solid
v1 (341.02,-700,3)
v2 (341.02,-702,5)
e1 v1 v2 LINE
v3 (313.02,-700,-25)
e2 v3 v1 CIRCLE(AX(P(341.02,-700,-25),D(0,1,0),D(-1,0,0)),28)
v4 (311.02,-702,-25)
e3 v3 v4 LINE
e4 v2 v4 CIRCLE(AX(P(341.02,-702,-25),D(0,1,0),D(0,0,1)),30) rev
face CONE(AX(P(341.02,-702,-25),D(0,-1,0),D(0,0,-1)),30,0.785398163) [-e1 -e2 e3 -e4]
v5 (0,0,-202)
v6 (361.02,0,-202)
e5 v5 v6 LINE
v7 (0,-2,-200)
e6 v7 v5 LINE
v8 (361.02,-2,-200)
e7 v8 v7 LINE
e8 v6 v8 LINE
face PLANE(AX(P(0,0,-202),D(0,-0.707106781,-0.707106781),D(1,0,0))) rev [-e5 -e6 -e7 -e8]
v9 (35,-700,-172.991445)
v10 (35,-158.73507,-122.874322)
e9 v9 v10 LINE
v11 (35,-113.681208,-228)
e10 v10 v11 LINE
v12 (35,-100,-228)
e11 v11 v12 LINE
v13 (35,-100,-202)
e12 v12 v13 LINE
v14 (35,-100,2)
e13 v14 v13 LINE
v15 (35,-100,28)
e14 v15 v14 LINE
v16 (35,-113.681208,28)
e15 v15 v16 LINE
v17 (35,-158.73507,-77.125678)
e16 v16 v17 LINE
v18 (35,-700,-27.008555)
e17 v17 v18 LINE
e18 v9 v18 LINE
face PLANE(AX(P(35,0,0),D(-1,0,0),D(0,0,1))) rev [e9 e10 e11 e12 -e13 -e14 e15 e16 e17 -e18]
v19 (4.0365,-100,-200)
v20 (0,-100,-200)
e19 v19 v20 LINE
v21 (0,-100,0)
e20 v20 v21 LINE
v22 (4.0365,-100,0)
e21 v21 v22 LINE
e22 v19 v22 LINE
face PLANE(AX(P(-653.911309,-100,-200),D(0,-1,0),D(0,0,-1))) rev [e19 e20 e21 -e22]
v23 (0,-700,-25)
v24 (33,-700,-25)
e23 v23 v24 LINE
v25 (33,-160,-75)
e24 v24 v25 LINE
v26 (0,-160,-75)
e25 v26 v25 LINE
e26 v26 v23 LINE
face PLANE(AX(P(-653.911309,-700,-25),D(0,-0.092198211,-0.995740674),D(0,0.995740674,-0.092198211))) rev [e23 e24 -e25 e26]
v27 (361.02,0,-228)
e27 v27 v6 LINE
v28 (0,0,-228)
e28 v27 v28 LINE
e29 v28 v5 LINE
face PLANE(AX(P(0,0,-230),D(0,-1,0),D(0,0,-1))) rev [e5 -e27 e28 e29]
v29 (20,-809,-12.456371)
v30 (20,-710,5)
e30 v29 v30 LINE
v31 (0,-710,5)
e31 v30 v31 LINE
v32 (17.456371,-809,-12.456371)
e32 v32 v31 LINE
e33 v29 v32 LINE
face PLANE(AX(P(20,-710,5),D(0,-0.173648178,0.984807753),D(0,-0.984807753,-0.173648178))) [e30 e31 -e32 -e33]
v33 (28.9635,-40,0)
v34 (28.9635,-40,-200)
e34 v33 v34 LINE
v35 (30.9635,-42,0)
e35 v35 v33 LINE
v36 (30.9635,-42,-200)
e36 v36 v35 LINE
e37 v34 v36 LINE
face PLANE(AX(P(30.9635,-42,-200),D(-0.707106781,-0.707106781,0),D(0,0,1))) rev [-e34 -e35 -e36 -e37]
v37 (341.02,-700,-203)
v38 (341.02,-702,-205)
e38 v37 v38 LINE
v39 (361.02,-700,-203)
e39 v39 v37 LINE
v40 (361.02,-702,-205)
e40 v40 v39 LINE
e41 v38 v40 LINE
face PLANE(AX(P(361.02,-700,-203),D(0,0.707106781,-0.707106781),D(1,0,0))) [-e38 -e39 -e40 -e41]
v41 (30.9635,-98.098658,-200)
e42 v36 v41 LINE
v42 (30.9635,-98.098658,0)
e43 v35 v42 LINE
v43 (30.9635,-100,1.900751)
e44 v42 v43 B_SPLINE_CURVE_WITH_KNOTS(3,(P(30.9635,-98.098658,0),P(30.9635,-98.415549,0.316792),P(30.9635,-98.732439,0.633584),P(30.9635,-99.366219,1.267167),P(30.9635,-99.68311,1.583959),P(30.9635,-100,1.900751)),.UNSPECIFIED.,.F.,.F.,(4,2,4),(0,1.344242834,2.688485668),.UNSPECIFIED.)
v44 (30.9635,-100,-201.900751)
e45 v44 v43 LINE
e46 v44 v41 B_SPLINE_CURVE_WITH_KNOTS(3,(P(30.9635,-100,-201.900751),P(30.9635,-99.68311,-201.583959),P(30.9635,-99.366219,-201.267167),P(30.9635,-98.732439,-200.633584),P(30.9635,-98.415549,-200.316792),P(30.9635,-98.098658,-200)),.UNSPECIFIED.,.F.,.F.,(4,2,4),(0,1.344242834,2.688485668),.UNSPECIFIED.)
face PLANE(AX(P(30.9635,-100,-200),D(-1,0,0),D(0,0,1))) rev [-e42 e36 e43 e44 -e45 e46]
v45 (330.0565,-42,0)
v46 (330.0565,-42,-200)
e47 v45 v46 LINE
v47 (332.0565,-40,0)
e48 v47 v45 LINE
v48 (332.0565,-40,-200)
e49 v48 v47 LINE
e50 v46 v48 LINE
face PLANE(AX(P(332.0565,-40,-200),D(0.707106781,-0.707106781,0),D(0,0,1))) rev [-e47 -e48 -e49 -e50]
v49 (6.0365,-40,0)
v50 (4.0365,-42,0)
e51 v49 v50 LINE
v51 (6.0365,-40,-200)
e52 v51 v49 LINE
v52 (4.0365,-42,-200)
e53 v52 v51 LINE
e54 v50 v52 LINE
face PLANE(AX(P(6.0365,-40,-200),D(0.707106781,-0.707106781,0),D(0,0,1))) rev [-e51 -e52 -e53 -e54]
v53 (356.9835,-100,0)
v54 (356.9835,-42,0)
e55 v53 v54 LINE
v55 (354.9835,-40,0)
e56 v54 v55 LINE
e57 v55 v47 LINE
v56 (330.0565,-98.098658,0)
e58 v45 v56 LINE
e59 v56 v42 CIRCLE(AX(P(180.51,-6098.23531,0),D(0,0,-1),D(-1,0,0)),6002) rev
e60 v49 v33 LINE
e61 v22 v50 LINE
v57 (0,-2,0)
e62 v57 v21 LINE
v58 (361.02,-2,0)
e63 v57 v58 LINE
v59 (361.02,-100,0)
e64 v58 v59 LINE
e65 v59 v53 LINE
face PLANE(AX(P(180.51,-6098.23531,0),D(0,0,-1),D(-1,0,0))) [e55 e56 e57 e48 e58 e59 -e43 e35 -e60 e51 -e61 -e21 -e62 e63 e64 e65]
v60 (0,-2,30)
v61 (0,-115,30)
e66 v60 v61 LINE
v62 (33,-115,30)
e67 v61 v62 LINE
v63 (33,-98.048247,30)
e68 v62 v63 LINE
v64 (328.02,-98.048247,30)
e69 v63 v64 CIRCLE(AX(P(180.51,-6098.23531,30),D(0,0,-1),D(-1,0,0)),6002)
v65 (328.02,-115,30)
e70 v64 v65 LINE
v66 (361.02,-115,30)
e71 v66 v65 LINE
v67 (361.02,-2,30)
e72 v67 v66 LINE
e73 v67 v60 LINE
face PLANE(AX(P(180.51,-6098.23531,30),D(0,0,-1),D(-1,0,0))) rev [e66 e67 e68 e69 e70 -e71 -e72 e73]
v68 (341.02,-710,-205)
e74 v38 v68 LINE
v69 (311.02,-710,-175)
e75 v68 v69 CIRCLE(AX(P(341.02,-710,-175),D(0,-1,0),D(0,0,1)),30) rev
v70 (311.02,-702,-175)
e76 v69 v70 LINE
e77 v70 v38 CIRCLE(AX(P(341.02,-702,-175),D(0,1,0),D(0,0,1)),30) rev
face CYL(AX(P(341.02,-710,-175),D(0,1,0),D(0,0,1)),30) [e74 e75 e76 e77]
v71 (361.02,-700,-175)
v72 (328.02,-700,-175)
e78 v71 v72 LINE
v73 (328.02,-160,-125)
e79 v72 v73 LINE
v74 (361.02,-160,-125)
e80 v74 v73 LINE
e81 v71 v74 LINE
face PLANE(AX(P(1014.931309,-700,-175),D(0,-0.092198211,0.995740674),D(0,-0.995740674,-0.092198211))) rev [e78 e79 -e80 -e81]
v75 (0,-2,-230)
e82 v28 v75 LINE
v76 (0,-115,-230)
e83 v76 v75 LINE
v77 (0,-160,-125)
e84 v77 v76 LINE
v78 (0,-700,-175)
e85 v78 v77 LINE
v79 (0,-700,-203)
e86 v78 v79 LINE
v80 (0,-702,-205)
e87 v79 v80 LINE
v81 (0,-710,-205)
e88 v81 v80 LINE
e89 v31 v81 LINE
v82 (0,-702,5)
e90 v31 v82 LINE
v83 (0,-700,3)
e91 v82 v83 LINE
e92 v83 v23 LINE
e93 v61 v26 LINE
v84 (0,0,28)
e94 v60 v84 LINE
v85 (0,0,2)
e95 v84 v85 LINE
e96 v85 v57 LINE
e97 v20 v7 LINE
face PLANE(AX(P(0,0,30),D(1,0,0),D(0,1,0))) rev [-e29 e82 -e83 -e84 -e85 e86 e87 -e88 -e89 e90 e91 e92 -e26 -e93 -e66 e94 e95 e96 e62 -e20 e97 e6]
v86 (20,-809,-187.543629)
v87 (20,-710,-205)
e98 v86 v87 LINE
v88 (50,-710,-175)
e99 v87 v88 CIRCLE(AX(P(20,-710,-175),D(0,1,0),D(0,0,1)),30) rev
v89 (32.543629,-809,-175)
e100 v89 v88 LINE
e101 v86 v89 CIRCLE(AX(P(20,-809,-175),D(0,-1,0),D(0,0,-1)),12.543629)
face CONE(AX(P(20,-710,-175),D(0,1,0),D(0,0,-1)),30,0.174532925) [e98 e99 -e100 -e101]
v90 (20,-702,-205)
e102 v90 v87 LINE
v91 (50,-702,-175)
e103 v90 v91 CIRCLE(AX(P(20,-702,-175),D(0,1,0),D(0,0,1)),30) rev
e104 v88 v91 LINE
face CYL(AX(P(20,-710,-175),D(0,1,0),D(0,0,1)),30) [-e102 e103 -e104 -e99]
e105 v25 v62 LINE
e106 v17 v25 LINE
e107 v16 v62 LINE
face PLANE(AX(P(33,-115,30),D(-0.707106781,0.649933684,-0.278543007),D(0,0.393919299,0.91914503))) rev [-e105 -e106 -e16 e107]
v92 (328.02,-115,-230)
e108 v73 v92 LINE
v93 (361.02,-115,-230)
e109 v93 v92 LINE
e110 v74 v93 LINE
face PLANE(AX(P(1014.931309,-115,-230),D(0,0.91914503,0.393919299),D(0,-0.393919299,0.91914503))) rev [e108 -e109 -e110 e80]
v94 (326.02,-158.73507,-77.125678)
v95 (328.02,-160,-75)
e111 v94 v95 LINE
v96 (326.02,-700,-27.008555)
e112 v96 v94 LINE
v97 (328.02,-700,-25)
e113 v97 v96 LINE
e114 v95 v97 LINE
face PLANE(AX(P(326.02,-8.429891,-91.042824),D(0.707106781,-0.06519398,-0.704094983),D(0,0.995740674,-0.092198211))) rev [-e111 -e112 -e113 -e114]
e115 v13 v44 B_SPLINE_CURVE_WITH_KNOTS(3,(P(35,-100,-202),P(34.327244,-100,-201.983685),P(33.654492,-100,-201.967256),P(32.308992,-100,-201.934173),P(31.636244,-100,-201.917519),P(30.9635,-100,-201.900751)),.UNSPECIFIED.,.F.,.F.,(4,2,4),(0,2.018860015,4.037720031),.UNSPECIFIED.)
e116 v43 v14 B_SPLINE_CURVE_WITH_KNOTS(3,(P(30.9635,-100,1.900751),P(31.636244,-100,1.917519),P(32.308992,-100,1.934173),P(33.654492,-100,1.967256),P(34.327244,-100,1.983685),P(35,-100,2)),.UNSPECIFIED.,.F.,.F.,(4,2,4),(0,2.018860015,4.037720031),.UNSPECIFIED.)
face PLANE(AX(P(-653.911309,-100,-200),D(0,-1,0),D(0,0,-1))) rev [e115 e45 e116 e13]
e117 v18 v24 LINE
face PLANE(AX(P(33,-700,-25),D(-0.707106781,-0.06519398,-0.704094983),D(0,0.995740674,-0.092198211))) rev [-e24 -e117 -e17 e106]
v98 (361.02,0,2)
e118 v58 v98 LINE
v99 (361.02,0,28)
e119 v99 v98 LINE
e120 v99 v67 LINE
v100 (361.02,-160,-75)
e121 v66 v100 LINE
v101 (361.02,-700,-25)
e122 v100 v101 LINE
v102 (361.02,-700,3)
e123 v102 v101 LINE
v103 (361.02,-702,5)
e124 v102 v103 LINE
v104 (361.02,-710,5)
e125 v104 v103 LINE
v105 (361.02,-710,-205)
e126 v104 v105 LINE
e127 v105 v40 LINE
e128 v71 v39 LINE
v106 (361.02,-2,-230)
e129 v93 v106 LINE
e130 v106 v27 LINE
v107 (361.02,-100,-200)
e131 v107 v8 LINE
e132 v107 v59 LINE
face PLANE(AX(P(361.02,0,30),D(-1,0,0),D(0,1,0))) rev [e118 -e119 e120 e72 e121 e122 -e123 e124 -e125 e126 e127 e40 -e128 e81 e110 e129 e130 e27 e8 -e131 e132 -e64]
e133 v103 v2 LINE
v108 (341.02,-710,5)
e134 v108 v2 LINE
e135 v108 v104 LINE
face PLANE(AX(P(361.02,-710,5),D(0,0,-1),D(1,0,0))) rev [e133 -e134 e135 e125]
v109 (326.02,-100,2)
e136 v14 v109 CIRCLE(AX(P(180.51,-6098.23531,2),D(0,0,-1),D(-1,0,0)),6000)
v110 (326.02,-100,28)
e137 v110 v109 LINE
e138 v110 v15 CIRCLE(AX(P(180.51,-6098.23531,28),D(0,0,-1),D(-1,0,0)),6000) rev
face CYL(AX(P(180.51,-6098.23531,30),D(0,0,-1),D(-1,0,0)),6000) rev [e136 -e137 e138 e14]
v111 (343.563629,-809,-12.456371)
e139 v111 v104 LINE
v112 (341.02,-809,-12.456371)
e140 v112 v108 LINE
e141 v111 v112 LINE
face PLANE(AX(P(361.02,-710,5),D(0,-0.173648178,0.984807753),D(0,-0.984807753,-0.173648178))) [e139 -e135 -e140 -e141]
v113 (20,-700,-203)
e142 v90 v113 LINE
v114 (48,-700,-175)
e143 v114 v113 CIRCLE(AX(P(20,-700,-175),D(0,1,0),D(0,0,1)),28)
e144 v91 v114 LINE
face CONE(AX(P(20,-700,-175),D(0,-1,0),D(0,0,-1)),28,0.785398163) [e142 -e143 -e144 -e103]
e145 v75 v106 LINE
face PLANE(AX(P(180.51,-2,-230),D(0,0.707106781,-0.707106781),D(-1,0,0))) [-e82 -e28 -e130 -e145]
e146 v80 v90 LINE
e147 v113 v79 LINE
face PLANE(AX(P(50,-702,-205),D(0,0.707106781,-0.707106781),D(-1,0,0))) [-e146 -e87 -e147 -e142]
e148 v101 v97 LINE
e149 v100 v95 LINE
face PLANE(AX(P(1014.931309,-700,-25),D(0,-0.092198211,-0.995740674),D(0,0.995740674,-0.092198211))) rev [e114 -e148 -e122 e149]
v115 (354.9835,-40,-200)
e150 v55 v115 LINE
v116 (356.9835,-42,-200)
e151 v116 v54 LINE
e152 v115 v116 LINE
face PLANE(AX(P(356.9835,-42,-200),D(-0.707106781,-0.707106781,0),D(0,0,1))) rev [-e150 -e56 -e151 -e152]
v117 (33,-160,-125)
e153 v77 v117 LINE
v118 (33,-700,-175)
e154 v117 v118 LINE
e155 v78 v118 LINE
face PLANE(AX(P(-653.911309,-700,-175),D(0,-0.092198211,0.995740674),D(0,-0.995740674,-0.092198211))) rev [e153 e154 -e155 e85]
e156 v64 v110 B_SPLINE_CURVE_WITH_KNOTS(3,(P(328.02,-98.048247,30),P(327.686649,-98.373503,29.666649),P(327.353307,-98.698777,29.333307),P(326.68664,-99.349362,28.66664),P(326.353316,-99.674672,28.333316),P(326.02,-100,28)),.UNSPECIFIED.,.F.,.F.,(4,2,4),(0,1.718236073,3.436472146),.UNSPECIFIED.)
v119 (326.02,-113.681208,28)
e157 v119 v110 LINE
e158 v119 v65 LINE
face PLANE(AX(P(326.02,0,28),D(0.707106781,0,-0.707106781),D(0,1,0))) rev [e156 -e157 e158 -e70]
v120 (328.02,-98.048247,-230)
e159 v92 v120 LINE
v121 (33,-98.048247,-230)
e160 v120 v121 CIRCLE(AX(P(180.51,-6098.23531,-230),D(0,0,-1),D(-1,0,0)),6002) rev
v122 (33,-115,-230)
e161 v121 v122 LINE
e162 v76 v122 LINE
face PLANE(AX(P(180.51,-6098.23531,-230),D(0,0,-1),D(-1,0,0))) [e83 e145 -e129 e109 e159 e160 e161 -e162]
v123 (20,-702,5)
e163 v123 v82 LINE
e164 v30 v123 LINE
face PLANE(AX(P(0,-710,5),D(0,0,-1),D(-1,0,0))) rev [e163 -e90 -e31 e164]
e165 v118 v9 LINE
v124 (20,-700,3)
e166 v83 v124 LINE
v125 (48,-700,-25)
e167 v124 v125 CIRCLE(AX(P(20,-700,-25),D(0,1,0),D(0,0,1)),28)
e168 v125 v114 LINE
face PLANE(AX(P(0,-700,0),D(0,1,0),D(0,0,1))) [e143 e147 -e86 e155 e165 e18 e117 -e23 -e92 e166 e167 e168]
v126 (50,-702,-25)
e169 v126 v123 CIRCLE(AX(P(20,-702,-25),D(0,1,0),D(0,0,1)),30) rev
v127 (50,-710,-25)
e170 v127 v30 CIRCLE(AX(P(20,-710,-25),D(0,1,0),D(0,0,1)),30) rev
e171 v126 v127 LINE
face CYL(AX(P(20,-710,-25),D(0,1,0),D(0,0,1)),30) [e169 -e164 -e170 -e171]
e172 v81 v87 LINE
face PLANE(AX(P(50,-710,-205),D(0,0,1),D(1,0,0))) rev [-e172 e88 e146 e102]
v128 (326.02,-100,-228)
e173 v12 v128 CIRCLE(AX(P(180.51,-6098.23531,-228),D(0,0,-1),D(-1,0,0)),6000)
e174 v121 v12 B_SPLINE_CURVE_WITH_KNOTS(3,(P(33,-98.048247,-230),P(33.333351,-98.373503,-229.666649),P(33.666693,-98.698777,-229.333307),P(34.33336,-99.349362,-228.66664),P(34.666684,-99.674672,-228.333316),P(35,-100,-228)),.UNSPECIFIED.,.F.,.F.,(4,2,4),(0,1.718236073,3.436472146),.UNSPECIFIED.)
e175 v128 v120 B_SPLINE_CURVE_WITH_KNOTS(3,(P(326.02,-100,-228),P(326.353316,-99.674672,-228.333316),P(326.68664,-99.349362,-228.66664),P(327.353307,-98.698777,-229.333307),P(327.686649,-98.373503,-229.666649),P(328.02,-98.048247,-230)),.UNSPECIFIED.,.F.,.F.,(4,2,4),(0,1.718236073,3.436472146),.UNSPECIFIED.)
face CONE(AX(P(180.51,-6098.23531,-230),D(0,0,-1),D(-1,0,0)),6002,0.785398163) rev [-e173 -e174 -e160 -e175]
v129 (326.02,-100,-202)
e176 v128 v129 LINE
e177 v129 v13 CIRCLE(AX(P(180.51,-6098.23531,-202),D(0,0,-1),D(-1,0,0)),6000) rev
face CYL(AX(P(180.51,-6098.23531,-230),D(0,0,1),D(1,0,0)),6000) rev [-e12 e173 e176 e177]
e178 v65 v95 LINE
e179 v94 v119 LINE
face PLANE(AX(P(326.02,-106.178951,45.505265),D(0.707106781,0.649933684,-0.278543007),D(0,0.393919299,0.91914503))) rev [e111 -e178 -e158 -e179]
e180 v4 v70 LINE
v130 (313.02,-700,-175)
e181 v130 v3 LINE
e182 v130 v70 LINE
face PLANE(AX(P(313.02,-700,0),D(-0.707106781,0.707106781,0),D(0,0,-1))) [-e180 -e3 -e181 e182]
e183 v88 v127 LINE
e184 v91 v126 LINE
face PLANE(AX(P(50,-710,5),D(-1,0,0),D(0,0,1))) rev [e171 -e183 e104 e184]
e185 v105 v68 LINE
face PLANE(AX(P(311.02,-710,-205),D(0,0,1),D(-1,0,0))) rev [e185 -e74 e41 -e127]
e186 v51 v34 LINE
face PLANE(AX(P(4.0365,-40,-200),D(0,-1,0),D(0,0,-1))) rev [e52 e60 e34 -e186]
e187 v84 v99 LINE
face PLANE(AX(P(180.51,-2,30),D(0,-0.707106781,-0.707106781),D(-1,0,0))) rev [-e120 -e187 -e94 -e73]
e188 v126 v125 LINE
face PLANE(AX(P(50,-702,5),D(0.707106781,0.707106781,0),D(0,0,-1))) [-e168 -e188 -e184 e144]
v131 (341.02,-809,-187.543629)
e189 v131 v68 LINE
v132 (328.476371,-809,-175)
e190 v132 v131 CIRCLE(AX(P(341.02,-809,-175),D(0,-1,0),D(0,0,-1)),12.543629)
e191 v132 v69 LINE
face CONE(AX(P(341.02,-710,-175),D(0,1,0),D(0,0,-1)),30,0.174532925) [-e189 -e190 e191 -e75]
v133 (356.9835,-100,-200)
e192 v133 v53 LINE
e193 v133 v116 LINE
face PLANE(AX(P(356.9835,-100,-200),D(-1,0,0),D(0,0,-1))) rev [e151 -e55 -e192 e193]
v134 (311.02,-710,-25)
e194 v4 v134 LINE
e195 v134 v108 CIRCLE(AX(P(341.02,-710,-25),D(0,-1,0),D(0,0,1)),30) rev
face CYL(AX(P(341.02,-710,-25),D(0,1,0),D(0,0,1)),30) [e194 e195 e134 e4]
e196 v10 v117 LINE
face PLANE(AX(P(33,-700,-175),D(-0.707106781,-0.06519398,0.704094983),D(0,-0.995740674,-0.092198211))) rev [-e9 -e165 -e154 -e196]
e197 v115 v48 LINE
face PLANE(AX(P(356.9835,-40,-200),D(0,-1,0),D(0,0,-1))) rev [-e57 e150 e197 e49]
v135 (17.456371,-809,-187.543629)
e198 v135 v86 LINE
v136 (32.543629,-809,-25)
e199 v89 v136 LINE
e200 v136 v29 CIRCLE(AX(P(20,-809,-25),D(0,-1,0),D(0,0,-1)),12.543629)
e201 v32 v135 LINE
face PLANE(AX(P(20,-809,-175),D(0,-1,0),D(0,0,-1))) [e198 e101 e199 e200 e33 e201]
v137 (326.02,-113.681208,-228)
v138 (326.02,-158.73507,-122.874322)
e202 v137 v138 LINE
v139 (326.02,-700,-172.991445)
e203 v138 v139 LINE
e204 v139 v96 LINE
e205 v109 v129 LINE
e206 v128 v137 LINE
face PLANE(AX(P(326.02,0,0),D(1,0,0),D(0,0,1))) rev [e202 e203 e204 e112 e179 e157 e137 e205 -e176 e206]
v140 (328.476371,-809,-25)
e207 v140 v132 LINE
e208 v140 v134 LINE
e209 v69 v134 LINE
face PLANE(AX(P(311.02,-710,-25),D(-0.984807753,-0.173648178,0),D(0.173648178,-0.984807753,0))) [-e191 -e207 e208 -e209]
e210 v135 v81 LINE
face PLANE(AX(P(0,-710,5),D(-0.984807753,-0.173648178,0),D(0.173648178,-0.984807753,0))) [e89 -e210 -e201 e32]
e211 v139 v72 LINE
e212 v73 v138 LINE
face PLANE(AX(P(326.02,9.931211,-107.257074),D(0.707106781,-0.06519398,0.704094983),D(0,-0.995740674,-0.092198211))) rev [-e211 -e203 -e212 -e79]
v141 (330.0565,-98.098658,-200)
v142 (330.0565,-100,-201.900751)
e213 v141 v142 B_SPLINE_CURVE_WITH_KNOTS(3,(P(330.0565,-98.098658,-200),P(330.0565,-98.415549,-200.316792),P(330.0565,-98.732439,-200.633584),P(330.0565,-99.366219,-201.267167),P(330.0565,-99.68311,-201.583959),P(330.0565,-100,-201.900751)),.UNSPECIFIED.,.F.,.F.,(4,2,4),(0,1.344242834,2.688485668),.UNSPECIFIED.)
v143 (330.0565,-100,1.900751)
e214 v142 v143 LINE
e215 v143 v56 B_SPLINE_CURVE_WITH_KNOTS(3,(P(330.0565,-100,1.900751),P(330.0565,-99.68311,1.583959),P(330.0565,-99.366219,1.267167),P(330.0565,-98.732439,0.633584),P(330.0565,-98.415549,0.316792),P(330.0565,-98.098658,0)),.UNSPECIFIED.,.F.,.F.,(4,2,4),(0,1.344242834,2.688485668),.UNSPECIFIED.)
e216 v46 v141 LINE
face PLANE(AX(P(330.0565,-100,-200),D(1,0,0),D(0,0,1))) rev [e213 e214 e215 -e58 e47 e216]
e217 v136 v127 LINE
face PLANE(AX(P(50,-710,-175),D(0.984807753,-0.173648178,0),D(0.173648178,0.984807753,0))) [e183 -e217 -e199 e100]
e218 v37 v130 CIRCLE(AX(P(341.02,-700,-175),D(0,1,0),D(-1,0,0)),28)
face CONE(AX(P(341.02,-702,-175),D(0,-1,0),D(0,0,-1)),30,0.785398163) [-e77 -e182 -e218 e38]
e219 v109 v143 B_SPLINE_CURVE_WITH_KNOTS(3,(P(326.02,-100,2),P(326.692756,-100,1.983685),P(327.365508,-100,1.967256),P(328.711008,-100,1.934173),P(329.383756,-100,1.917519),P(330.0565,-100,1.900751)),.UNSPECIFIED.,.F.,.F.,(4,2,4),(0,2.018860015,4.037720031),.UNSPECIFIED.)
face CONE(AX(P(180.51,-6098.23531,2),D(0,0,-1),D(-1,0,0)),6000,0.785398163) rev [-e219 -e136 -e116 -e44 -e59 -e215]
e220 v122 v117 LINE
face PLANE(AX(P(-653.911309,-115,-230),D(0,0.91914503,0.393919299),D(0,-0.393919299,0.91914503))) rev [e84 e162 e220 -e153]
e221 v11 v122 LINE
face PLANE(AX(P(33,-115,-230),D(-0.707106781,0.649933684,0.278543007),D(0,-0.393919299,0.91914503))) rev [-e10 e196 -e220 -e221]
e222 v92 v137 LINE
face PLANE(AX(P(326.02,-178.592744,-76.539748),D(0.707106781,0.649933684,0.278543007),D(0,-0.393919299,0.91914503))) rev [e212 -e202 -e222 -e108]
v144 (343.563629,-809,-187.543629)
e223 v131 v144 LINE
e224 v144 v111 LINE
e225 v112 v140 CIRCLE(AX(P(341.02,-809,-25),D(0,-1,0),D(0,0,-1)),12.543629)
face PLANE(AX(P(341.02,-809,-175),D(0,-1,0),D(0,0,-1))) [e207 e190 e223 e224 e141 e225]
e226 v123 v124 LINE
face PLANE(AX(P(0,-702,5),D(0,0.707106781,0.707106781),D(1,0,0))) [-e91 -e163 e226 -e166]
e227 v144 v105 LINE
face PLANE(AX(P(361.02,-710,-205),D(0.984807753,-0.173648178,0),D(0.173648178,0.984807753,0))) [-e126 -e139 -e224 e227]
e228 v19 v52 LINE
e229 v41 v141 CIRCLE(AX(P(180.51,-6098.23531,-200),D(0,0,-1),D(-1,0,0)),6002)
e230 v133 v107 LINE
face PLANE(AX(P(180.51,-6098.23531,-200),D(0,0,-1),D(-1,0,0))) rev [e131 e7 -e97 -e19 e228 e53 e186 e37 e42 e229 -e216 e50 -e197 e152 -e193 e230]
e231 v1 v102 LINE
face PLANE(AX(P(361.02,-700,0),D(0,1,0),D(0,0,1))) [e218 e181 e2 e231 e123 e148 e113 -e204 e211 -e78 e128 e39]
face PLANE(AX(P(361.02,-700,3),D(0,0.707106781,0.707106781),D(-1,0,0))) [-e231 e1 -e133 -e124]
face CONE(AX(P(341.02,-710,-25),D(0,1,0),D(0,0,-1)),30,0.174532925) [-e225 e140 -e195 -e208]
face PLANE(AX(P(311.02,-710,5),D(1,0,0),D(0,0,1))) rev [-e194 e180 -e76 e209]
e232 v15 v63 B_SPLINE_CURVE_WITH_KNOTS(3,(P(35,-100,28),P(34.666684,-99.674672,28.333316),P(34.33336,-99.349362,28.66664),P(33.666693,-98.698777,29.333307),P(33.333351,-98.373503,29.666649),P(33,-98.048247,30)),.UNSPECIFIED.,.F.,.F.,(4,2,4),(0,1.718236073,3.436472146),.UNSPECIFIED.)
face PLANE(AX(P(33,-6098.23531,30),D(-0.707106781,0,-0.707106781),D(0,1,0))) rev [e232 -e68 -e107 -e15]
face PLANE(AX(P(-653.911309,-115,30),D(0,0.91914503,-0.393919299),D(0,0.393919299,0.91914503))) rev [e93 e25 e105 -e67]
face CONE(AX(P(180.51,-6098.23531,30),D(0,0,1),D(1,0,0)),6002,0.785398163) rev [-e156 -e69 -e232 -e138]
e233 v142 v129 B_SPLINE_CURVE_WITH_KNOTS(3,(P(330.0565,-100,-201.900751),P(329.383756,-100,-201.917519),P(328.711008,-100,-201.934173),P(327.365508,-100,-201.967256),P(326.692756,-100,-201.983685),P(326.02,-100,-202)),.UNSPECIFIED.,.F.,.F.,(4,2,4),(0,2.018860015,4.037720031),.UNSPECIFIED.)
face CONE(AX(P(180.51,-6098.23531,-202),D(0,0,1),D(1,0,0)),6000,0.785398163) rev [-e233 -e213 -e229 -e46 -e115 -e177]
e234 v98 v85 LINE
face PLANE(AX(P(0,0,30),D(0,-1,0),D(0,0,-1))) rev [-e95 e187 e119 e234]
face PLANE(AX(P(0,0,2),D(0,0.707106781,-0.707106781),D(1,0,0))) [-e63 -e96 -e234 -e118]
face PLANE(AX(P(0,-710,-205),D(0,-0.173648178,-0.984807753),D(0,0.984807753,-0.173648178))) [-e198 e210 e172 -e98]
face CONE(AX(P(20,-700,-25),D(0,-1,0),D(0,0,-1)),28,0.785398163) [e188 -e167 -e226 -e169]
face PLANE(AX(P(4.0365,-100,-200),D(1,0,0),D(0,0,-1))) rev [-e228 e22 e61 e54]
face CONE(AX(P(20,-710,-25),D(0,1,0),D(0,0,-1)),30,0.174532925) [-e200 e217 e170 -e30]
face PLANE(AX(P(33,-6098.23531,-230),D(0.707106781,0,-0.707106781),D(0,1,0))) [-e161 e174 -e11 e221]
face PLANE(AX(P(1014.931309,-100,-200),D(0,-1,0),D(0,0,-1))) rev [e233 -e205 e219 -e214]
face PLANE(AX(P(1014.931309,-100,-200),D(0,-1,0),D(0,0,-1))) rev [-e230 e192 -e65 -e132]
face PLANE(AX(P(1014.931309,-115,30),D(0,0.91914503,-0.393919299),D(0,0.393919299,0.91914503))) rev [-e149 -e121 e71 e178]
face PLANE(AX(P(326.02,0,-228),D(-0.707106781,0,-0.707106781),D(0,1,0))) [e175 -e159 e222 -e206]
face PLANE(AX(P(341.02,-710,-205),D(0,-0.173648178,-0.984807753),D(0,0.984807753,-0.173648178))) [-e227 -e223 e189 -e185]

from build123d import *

# Parameters (mm, degrees)
BOSS_EXTRUDE1_DEPTH           = 30
SKETCH2_W                     = 26.926999998
SKETCH2_H                     = 60
BOSS_EXTRUDE2_DEPTH           = 200
BOSS_EXTRUDE3_START           = 30
BOSS_EXTRUDE3_DEPTH           = 30
BOSS_EXTRUDE4_DEPTH           = 4.0365
BOSS_EXTRUDE4_DEPTH_BACK      = 30.9635
BOSS_EXTRUDE5_DEPTH           = 10
FILLET1_R                     = 30
SKETCH7_W                     = 260
SKETCH7_H                     = 710
CUT_EXTRUDE1_DEPTH            = 768.843643003
CHAMFER1_SIZE                 = 2
CHAMFER2_SIZE                 = 2
CHAMFER3_SIZE                 = 2
CHAMFER4_SIZE                 = 2
CHAMFER6_SIZE                 = 2
BOSS_EXTRUDE6_DEPTH           = 99
BOSS_EXTRUDE6_DRAFT           = 10
BOSS_EXTRUDE6_PROFILE_2_DEPTH = 99
BOSS_EXTRUDE6_PROFILE_2_DRAFT = 10


with BuildPart() as part:
    # Sketch1 → Boss-Extrude1 (new body)
    with BuildSketch(Plane.XY):
        with BuildLine():
            Line((0, 0), (361.02, 0))
            Line((361.02, 0), (361.02, -100))
            Line((361.02, -100), (326.02, -100))
            ThreePointArc((326.02, -100), (180.51, -98.235310481), (35, -100))
            Line((35, -100), (0, -100))
            Line((0, -100), (0, 0))
        make_face()
    extrude(amount=BOSS_EXTRUDE1_DEPTH)

    # Sketch2 → Boss-Extrude2 (add)
    with BuildSketch(Plane(origin=(0, 0, 0), x_dir=(-1, 0, 0), z_dir=(0, 0, -1))):
        with Locations((-343.52, -70)):
            Rectangle(SKETCH2_W, SKETCH2_H)
        with Locations((-17.5, -70)):
            Rectangle(SKETCH2_W, SKETCH2_H)
    extrude(amount=BOSS_EXTRUDE2_DEPTH)

    # Sketch3 → Boss-Extrude3 (add)
    with BuildSketch(Plane(origin=(0, 0, -200), x_dir=(-1, 0, 0), z_dir=(0, 0, -1)).offset(BOSS_EXTRUDE3_START)):
        with BuildLine():
            Line((0, -100), (0, 0))
            Line((0, 0), (-361.02, 0))
            Line((-361.02, 0), (-361.02, -100))
            Line((-361.02, -100), (-326.02, -100))
            ThreePointArc((-326.02, -100), (-180.51, -98.235310481), (-35, -100))
            Line((-35, -100), (0, -100))
        make_face()
    extrude(amount=-BOSS_EXTRUDE3_DEPTH)

    # Sketch5 → Boss-Extrude4 (add, two sides: drawn at the far end of the back side and taken through both)
    with BuildSketch(Plane.ZY.offset(-4.036500001).offset(-BOSS_EXTRUDE4_DEPTH_BACK)):
        Polygon((-200, -100), (0, -100), (30, -100), (30, -115), (-75, -160), (-25, -700), (-100, -700), (-175, -700), (-125, -160), (-230, -115), (-230, -100), align=None)
    extrude(amount=BOSS_EXTRUDE4_DEPTH + BOSS_EXTRUDE4_DEPTH_BACK)

    # Sketch6 → Boss-Extrude5 (add)
    with BuildSketch(Plane.XZ.offset(700)):
        Polygon((0, -25), (0, 5), (50, 5), (50, -205), (0, -205), (0, -175), align=None)
    extrude(amount=BOSS_EXTRUDE5_DEPTH)

    # Fillet1
    fillet1_edges = [part.edges().sort_by_distance(p)[0] for p in [
        (50, -705, -205),
        (50, -705, 5),
    ]]
    fillet(fillet1_edges, radius=FILLET1_R)

    # Sketch7 → Cut-Extrude1 (cut, through all)
    with BuildSketch(Plane(origin=(180.51, 0, 0), x_dir=(0, 0, -1), z_dir=(1, 0, 0))):
        with Locations((100, -355)):
            Rectangle(SKETCH7_W, SKETCH7_H)
    extrude(amount=CUT_EXTRUDE1_DEPTH, mode=Mode.SUBTRACT)

    # Mirror2: part across plane


with BuildPart() as part_1:
    add(part.part)
    add(part.part.mirror(Plane(origin=(180.51, 0, 0), x_dir=(0, 0, 1), z_dir=(1, 0, 0))))

    # Chamfer1
    chamfer1_edges = [part_1.edges().sort_by_distance(p)[0] for p in [
        (180.51, 0, 30),
        (180.51, 0, 0),
        (180.51, 0, -200),
        (180.51, 0, -230),
    ]]
    chamfer(chamfer1_edges, length=CHAMFER1_SIZE)

    # Chamfer2
    chamfer2_edges = [part_1.edges().sort_by_distance(p)[0] for p in [
        (356.983499999, -40, -100),
        (330.056500001, -40, -100),
        (4.036500001, -40, -100),
        (30.963499999, -40, -100),
    ]]
    chamfer(chamfer2_edges, length=CHAMFER2_SIZE)

    # Chamfer3
    chamfer3_edges = [part_1.edges().sort_by_distance(p)[0] for p in [
        (326.019999999, -107.5, -230),
        (326.019999999, -137.5, -177.5),
        (326.019999999, -430, -150),
        (326.019999999, -430, -50),
        (326.019999999, -137.5, -22.5),
        (326.019999999, -107.5, 30),
        (35.000000001, -107.5, 30),
        (35.000000001, -137.5, -22.5),
        (35.000000001, -430, -50),
        (35.000000001, -430, -150),
        (35.000000001, -137.5, -177.5),
        (35.000000001, -107.5, -230),
    ]]
    chamfer(chamfer3_edges, length=CHAMFER3_SIZE)

    # Chamfer4
    chamfer4_edges = [part_1.edges().sort_by_distance(p)[0] for p in [
        (50, -700, -100),
        (10, -700, 5),
        (41.213203436, -700, -3.786796564),
        (41.213203436, -700, -196.213203436),
        (311.02, -700, -100),
        (351.02, -700, 5),
        (351.02, -700, -205),
        (319.806796564, -700, -196.213203436),
        (319.806796564, -700, -3.786796564),
        (10, -700, -205),
    ]]
    chamfer(chamfer4_edges, length=CHAMFER4_SIZE)

    # Chamfer6
    # the kernel refuses this chamfer: 2 mm, written as the material it takes off along each edge
    with BuildSketch(Plane(origin=(180.51, -6098.235310479, 30), x_dir=(0.025441959758898923, 0.9996763009512762, 0), z_dir=(0.9996763009512762, -0.025441959758898923, 0))) as chamfer6_piece_1_section:
        Polygon((5999.999999998 + CHAMFER6_SIZE, 0), (5999.999999998, -CHAMFER6_SIZE), (5999.999999998, 0), align=None)
    chamfer6_piece_1 = revolve(axis=Axis((180.51, -6098.235310479, 30), (0, 0, 1)), revolution_arc=2.915748449, mode=Mode.PRIVATE)
    chamfer6_piece_1 = split(chamfer6_piece_1, bisect_by=Plane(origin=(327.145000629, -99.268037673, 29.12500063), z_dir=(-0.7071067811865476, 0, 0.7071067811865476)), keep=Keep.TOP, mode=Mode.PRIVATE)
    chamfer6_piece_1 = split(chamfer6_piece_1, bisect_by=Plane(origin=(180.135000332, -99.268037673, -117.135000331), z_dir=(0.7071067811865476, 0, 0.7071067811865476)), keep=Keep.TOP, mode=Mode.PRIVATE)
    add(chamfer6_piece_1, mode=Mode.SUBTRACT)
    with BuildSketch(Plane(origin=(180.51, -6098.235310479, 0), x_dir=(0.02510863351858876, 0.9996847285633752, 0), z_dir=(0.9996847285633752, -0.02510863351858876, 0))) as chamfer6_piece_2_section:
        Polygon((5999.999999998 + CHAMFER6_SIZE, 0), (5999.999999998, CHAMFER6_SIZE), (5999.999999998, 0), align=None)
    chamfer6_piece_2 = revolve(axis=Axis((180.51, -6098.235310479, 0), (0, 0, 1)), revolution_arc=2.877539868, mode=Mode.PRIVATE)
    chamfer6_piece_2 = split(chamfer6_piece_2, bisect_by=Plane(origin=(328.004034253, -100, 0.650481022), z_dir=(0, 1, 0)), keep=Keep.TOP, mode=Mode.PRIVATE)
    chamfer6_piece_2 = split(chamfer6_piece_2, bisect_by=Plane(origin=(330.056500001, -99.349322449, 0.650481022), z_dir=(-1, 0, 0)), keep=Keep.TOP, mode=Mode.PRIVATE)
    chamfer6_piece_2 = split(chamfer6_piece_2, bisect_by=Plane(origin=(30.963499999, -99.349322449, 0.650481022), z_dir=(1, 0, 0)), keep=Keep.TOP, mode=Mode.PRIVATE)
    add(chamfer6_piece_2, mode=Mode.SUBTRACT)
    with BuildSketch(Plane(origin=(180.51, -6098.235310479, -200), x_dir=(-0.025108633518586027, 0.9996847285633753, 0), z_dir=(-0.9996847285633753, -0.025108633518586027, 0))) as chamfer6_piece_3_section:
        Polygon((5999.999999998 + CHAMFER6_SIZE, 0), (5999.999999998, CHAMFER6_SIZE), (5999.999999998, 0), align=None)
    chamfer6_piece_3 = revolve(axis=Axis((180.51, -6098.235310479, -200), (0, 0, -1)), revolution_arc=2.877539868, mode=Mode.PRIVATE)
    chamfer6_piece_3 = split(chamfer6_piece_3, bisect_by=Plane(origin=(33.015965747, -100, -200.650481022), z_dir=(0, 1, 0)), keep=Keep.TOP, mode=Mode.PRIVATE)
    chamfer6_piece_3 = split(chamfer6_piece_3, bisect_by=Plane(origin=(330.056500001, -99.349322449, -200.650481022), z_dir=(-1, 0, 0)), keep=Keep.TOP, mode=Mode.PRIVATE)
    chamfer6_piece_3 = split(chamfer6_piece_3, bisect_by=Plane(origin=(30.963499999, -99.349322449, -200.650481022), z_dir=(1, 0, 0)), keep=Keep.TOP, mode=Mode.PRIVATE)
    add(chamfer6_piece_3, mode=Mode.SUBTRACT)
    with BuildSketch(Plane(origin=(180.51, -6098.235310479, -230), x_dir=(-0.025441959758894937, 0.9996763009512762, 0), z_dir=(-0.9996763009512762, -0.025441959758894937, 0))) as chamfer6_piece_4_section:
        Polygon((5999.999999998 + CHAMFER6_SIZE, 0), (5999.999999998, -CHAMFER6_SIZE), (5999.999999998, 0), align=None)
    chamfer6_piece_4 = revolve(axis=Axis((180.51, -6098.235310479, -230), (0, 0, -1)), revolution_arc=2.915748449, mode=Mode.PRIVATE)
    chamfer6_piece_4 = split(chamfer6_piece_4, bisect_by=Plane(origin=(180.884999668, -99.268037673, -82.864999669), z_dir=(-0.7071067811865476, 0, -0.7071067811865476)), keep=Keep.TOP, mode=Mode.PRIVATE)
    chamfer6_piece_4 = split(chamfer6_piece_4, bisect_by=Plane(origin=(33.874999371, -99.268037673, -229.12500063), z_dir=(0.7071067811865476, 0, -0.7071067811865476)), keep=Keep.TOP, mode=Mode.PRIVATE)
    add(chamfer6_piece_4, mode=Mode.SUBTRACT)


with BuildPart() as boss_extrude6_tool:
    # Sketch10 → Boss-Extrude6 (with draft: the straight prism first)
    with BuildSketch(Plane.XZ.offset(710)):
        with BuildLine():
            Line((341.02, -205), (361.02, -205))
            Line((361.02, -205), (361.02, 5))
            Line((361.02, 5), (341.02, 5))
            ThreePointArc((341.02, 5), (319.806796564, -3.786796564), (311.02, -25))
            Line((311.02, -25), (311.02, -175))
            ThreePointArc((311.02, -175), (319.806796564, -196.213203436), (341.02, -205))
        make_face()
    extrude(amount=BOSS_EXTRUDE6_DEPTH)
    # Boss-Extrude6: the draft: its side faces are tilted about the plane it starts from
    boss_extrude6_sides = [boss_extrude6_tool.faces().sort_by_distance(p)[0] for p in [
        (351.02, -759.5, -205),
        (361.02, -759.5, -100),
        (351.02, -759.5, 5),
        (319.806796564, -759.5, -3.786796564),
        (311.02, -759.5, -100),
        (319.806796564, -759.5, -196.213203436),
    ]]
    draft(boss_extrude6_sides, Plane.XZ.offset(710), BOSS_EXTRUDE6_DRAFT)


with BuildPart() as part_2:
    add(part_1.part)

    # Boss-Extrude6: add boss_extrude6_tool
    add(boss_extrude6_tool.part)


with BuildPart() as boss_extrude6_profile_2_tool:
    # Sketch10 → Boss-Extrude6 profile 2 (with draft: the straight prism first)
    with BuildSketch(Plane.XZ.offset(710)):
        with BuildLine():
            Line((0, -205), (20, -205))
            ThreePointArc((20, -205), (41.213203436, -196.213203436), (50, -175))
            Line((50, -175), (50, -25))
            ThreePointArc((50, -25), (41.213203436, -3.786796564), (20, 5))
            Line((20, 5), (0, 5))
            Line((0, 5), (0, -205))
        make_face()
    extrude(amount=BOSS_EXTRUDE6_PROFILE_2_DEPTH)
    # Boss-Extrude6 profile 2: the draft: its side faces are tilted about the plane it starts from
    boss_extrude6_profile_2_sides = [boss_extrude6_profile_2_tool.faces().sort_by_distance(p)[0] for p in [
        (10, -759.5, -205),
        (41.213203436, -759.5, -196.213203436),
        (50, -759.5, -100),
        (41.213203436, -759.5, -3.786796564),
        (10, -759.5, 5),
        (0, -759.5, -100),
    ]]
    draft(boss_extrude6_profile_2_sides, Plane.XZ.offset(710), BOSS_EXTRUDE6_PROFILE_2_DRAFT)


with BuildPart() as part_3:
    add(part_2.part)

    # Boss-Extrude6 profile 2: add boss_extrude6_profile_2_tool
    add(boss_extrude6_profile_2_tool.part)


solid = part_3.part
